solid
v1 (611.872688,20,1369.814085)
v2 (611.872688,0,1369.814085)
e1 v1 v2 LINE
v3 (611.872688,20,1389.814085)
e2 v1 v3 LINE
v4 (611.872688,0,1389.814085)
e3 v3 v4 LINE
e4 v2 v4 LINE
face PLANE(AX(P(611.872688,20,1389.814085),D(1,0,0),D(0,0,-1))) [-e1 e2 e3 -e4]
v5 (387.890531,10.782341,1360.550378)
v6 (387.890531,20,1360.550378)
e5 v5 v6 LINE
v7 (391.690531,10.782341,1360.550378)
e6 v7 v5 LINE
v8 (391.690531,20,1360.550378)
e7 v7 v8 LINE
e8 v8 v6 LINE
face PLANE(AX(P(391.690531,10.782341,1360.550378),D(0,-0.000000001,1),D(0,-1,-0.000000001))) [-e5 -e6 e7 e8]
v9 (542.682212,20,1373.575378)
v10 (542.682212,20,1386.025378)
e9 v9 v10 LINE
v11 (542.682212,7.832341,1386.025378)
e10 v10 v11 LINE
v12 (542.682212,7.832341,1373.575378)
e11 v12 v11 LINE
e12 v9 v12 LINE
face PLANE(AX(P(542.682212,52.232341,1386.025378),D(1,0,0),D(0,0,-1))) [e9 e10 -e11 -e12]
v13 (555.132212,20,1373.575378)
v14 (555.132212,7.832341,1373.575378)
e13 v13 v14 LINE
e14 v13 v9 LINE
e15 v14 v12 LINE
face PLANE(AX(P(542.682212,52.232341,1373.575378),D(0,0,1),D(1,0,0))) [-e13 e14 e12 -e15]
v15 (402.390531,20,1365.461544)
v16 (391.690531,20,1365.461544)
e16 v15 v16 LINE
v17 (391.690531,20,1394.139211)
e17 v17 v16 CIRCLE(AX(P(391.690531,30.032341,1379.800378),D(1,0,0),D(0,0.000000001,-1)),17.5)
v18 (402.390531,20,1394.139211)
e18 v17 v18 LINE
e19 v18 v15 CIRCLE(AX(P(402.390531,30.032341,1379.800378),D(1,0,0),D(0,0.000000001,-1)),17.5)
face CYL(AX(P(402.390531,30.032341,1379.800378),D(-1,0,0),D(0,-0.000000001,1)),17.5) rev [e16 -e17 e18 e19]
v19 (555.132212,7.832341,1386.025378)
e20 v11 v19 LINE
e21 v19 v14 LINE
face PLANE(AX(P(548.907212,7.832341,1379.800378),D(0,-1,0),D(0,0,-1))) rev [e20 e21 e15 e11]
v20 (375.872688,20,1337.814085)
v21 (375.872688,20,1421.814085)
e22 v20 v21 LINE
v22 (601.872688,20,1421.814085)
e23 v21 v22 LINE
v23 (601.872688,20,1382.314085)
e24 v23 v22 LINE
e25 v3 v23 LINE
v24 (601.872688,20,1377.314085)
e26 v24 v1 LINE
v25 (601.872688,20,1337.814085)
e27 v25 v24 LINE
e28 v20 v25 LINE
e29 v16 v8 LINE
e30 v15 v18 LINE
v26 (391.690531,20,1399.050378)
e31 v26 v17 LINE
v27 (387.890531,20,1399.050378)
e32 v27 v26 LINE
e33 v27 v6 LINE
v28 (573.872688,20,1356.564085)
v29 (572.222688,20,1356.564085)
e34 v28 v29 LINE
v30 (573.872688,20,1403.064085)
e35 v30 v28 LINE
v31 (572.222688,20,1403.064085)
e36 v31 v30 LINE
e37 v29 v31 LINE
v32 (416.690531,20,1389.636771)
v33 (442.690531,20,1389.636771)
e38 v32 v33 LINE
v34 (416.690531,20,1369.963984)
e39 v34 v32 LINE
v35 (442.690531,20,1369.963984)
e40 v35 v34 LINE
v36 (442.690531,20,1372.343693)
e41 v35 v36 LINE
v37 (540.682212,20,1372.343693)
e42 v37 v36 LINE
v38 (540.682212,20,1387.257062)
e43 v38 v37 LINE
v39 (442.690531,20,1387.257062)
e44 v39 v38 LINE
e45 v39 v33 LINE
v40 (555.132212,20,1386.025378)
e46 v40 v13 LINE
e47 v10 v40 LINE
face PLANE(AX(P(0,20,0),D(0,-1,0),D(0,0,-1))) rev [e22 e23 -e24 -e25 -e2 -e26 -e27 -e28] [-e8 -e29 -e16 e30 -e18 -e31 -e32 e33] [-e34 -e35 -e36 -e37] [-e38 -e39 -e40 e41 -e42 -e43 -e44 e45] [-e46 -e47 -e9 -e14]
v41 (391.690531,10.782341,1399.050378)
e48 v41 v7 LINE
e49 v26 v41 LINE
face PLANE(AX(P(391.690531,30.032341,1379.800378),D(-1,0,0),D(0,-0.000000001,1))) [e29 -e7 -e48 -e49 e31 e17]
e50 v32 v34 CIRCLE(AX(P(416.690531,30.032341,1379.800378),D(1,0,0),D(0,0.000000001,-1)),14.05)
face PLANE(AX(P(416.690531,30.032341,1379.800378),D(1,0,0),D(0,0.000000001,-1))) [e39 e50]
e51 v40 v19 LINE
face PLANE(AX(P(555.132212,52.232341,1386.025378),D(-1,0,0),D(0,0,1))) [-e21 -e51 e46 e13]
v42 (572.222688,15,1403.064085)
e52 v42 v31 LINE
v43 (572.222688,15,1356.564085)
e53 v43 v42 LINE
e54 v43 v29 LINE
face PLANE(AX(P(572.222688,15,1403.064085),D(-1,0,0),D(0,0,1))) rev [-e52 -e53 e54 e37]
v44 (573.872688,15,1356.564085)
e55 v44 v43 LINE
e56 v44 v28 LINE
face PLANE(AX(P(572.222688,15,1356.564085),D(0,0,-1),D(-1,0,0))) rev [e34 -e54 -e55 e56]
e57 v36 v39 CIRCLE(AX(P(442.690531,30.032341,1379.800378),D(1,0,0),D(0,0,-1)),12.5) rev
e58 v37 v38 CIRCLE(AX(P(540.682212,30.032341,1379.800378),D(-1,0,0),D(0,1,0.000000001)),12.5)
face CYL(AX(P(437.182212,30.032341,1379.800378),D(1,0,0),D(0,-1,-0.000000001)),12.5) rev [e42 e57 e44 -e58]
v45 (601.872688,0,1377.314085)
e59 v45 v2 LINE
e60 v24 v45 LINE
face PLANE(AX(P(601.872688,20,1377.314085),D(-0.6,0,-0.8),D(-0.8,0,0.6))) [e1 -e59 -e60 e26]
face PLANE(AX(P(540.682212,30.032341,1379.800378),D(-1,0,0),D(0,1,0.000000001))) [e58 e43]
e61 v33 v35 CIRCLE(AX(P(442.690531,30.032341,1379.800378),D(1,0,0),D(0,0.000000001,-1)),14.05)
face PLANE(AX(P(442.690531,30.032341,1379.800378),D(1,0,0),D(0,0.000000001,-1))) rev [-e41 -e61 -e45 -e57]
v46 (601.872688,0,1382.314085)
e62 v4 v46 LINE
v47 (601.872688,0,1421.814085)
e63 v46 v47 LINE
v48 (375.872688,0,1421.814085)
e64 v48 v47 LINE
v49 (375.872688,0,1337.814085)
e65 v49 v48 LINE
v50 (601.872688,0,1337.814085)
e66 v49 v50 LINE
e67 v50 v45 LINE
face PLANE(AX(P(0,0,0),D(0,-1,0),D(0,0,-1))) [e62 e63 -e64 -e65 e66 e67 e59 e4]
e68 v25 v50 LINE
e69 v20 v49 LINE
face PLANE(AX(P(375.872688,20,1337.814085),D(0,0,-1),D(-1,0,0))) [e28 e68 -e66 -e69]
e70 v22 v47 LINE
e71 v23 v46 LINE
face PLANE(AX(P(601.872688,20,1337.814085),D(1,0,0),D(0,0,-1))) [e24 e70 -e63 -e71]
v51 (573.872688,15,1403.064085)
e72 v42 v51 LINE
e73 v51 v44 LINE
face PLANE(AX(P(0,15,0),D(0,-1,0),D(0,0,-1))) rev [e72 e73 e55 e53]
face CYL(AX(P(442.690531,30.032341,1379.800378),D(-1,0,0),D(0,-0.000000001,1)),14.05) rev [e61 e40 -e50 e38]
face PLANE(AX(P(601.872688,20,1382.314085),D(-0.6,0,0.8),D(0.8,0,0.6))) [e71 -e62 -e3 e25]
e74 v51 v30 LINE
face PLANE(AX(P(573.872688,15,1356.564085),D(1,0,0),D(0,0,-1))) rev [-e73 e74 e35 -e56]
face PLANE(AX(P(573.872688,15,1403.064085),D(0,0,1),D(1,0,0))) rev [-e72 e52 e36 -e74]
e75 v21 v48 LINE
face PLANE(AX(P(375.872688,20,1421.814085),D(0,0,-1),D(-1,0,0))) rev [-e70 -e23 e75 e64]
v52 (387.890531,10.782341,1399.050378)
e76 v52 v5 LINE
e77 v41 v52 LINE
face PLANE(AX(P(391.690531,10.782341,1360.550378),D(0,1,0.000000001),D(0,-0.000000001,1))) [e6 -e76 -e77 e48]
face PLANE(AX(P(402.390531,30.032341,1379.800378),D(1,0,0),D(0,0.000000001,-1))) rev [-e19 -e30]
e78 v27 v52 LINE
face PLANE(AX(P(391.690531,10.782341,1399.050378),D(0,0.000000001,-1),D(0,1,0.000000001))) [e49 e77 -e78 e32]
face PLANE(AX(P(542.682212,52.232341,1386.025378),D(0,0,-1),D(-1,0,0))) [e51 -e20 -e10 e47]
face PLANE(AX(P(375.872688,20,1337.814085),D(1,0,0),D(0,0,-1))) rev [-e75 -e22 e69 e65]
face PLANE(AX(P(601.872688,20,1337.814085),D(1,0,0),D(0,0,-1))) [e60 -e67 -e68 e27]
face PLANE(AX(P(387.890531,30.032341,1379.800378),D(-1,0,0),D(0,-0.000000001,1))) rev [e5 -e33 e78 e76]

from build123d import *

# Parameters (mm, degrees)
SKETCH1_W           = 226
SKETCH1_H           = 84
BOSS_EXTRUDE1_DEPTH = 20
BOSS_EXTRUDE2_DEPTH = 20
SKETCH4_W           = 1.65
SKETCH4_H           = 46.5
BOSS_EXTRUDE3_DEPTH = 5
SKETCH4_2_W         = 1.65
SKETCH4_2_H         = 46.5
CUT_EXTRUDE1_DEPTH  = 5
CAVITY2_START       = 416.690531323
CAVITY2_DEPTH       = 123.991681054
CAVITY2_START_2     = 387.890531323
CAVITY2_2_DEPTH     = 14.5
CAVITY2_3_DEPTH     = 3.8
CAVITY2_4_DEPTH     = 26
CAVITY2_START_3     = 542.682212377
CAVITY2_5_DEPTH     = 12.45
CAVITY2_6_OUTLINE_W = 10.967659298
CAVITY2_6_OUTLINE_H = 10.05
CAVITY2_6_DEPTH     = 1.2
CAVITY2_START_4     = 553.932212377
CAVITY2_7_OUTLINE_W = 10.967659298
CAVITY2_7_OUTLINE_H = 10.05
CAVITY2_7_DEPTH     = 1.2
SKETCH7_W           = 10.05
SKETCH7_H           = 10.05
CUT_EXTRUDE2_DEPTH  = 12


# Read off the part's stored shape, not the designer's step: Cavity2
with BuildPart() as part:
    # Sketch1 → Boss-Extrude1 (new body)
    with BuildSketch(Plane(origin=(375.872687737, 0, 1298.443562055), x_dir=(1, 0, 0), z_dir=(0, 1, 0))):
        with Locations((113, -81.370523073)):
            Rectangle(SKETCH1_W, SKETCH1_H)
    extrude(amount=BOSS_EXTRUDE1_DEPTH)

    # Sketch2 → Boss-Extrude2 (add)
    with BuildSketch(Plane.XZ):
        Polygon((601.872687737, 1377.314085128), (601.872687737, 1382.314085128), (611.872687737, 1389.814085128), (611.872687737, 1369.814085128), align=None)
    extrude(amount=-BOSS_EXTRUDE2_DEPTH)

    # Sketch4 → Boss-Extrude3 (add)
    with BuildSketch(Plane(origin=(0, 20, 0), x_dir=(1, 0, 0), z_dir=(0, 1, 0))):
        with Locations((573.047687737, -1379.814085128)):
            Rectangle(SKETCH4_W, SKETCH4_H)
    extrude(amount=-BOSS_EXTRUDE3_DEPTH)

    # Sketch4<2> → Cut-Extrude1 (cut)
    with BuildSketch(Plane(origin=(0, 20, 0), x_dir=(1, 0, 0), z_dir=(0, 1, 0))):
        with Locations((573.047687737, -1379.814085128)):
            Rectangle(SKETCH4_2_W, SKETCH4_2_H)
    extrude(amount=-CUT_EXTRUDE1_DEPTH, mode=Mode.SUBTRACT)

    # Cavity2 outline → Cavity2 (cut)
    with BuildSketch(Plane.YZ.offset(CAVITY2_START)):
        with BuildLine():
            ThreePointArc((20, 1387.257061845), (17.532340702, 1379.800377592), (20, 1372.34369334))
            Line((20, 1372.34369334), (20, 1387.257061845))
        make_face()
    extrude(amount=CAVITY2_DEPTH, mode=Mode.SUBTRACT)

    # Cavity2 2 outline → Cavity2 2 (cut)
    with BuildSketch(Plane.YZ.offset(CAVITY2_START_2)):
        with BuildLine():
            ThreePointArc((20, 1394.13921088), (12.532340702, 1379.800377593), (20, 1365.461544305))
            Line((20, 1365.461544305), (20, 1394.13921088))
        make_face()
    extrude(amount=CAVITY2_2_DEPTH, mode=Mode.SUBTRACT)

    # Cavity2 3 outline → Cavity2 3 (cut)
    with BuildSketch(Plane.YZ.offset(CAVITY2_START_2)):
        with BuildLine():
            Line((20, 1394.13921088), (20, 1399.050377582))
            Line((20, 1399.050377582), (10.782340682, 1399.050377573))
            Line((10.782340682, 1399.050377573), (10.782340722, 1360.550377573))
            Line((10.782340722, 1360.550377573), (20, 1360.550377582))
            Line((20, 1360.550377582), (20, 1365.461544305))
            ThreePointArc((20, 1365.461544305), (12.532340702, 1379.800377593), (20, 1394.13921088))
        make_face()
    extrude(amount=CAVITY2_3_DEPTH, mode=Mode.SUBTRACT)

    # Cavity2 4 outline → Cavity2 4 (cut)
    with BuildSketch(Plane.YZ.offset(CAVITY2_START)):
        with BuildLine():
            Line((20, 1387.257061845), (20, 1389.636771243))
            ThreePointArc((20, 1389.636771243), (15.982340702, 1379.800377593), (20, 1369.963983943))
            Line((20, 1369.963983943), (20, 1372.34369334))
            ThreePointArc((20, 1372.34369334), (17.532340702, 1379.800377592), (20, 1387.257061845))
        make_face()
    extrude(amount=CAVITY2_4_DEPTH, mode=Mode.SUBTRACT)

    # Cavity2 5 outline → Cavity2 5 (cut)
    with BuildSketch(Plane.YZ.offset(CAVITY2_START_3)):
        Polygon((20, 1386.025377593), (7.832340702, 1386.025377593), (7.832340702, 1373.575377593), (20, 1373.575377593), (20, 1374.775377593), (9.032340702, 1374.775377593), (9.032340702, 1384.825377593), (20, 1384.825377593), align=None)
    extrude(amount=CAVITY2_5_DEPTH, mode=Mode.SUBTRACT)

    # Cavity2 6 outline → Cavity2 6 (cut)
    with BuildSketch(Plane.YZ.offset(CAVITY2_START_3)):
        with Locations((14.516170351, 1379.800377593)):
            Rectangle(CAVITY2_6_OUTLINE_W, CAVITY2_6_OUTLINE_H)
    extrude(amount=CAVITY2_6_DEPTH, mode=Mode.SUBTRACT)

    # Cavity2 7 outline → Cavity2 7 (cut)
    with BuildSketch(Plane.YZ.offset(CAVITY2_START_4)):
        with Locations((14.516170351, 1379.800377593)):
            Rectangle(CAVITY2_7_OUTLINE_W, CAVITY2_7_OUTLINE_H)
    extrude(amount=CAVITY2_7_DEPTH, mode=Mode.SUBTRACT)

    # Sketch7 → Cut-Extrude2 (cut)
    with BuildSketch(Plane(origin=(0, 20, 0), x_dir=(1, 0, 0), z_dir=(0, 1, 0))):
        with Locations((548.907212377, -1379.800377593)):
            Rectangle(SKETCH7_W, SKETCH7_H)
    extrude(amount=-CUT_EXTRUDE2_DEPTH, mode=Mode.SUBTRACT)


solid = part.part
